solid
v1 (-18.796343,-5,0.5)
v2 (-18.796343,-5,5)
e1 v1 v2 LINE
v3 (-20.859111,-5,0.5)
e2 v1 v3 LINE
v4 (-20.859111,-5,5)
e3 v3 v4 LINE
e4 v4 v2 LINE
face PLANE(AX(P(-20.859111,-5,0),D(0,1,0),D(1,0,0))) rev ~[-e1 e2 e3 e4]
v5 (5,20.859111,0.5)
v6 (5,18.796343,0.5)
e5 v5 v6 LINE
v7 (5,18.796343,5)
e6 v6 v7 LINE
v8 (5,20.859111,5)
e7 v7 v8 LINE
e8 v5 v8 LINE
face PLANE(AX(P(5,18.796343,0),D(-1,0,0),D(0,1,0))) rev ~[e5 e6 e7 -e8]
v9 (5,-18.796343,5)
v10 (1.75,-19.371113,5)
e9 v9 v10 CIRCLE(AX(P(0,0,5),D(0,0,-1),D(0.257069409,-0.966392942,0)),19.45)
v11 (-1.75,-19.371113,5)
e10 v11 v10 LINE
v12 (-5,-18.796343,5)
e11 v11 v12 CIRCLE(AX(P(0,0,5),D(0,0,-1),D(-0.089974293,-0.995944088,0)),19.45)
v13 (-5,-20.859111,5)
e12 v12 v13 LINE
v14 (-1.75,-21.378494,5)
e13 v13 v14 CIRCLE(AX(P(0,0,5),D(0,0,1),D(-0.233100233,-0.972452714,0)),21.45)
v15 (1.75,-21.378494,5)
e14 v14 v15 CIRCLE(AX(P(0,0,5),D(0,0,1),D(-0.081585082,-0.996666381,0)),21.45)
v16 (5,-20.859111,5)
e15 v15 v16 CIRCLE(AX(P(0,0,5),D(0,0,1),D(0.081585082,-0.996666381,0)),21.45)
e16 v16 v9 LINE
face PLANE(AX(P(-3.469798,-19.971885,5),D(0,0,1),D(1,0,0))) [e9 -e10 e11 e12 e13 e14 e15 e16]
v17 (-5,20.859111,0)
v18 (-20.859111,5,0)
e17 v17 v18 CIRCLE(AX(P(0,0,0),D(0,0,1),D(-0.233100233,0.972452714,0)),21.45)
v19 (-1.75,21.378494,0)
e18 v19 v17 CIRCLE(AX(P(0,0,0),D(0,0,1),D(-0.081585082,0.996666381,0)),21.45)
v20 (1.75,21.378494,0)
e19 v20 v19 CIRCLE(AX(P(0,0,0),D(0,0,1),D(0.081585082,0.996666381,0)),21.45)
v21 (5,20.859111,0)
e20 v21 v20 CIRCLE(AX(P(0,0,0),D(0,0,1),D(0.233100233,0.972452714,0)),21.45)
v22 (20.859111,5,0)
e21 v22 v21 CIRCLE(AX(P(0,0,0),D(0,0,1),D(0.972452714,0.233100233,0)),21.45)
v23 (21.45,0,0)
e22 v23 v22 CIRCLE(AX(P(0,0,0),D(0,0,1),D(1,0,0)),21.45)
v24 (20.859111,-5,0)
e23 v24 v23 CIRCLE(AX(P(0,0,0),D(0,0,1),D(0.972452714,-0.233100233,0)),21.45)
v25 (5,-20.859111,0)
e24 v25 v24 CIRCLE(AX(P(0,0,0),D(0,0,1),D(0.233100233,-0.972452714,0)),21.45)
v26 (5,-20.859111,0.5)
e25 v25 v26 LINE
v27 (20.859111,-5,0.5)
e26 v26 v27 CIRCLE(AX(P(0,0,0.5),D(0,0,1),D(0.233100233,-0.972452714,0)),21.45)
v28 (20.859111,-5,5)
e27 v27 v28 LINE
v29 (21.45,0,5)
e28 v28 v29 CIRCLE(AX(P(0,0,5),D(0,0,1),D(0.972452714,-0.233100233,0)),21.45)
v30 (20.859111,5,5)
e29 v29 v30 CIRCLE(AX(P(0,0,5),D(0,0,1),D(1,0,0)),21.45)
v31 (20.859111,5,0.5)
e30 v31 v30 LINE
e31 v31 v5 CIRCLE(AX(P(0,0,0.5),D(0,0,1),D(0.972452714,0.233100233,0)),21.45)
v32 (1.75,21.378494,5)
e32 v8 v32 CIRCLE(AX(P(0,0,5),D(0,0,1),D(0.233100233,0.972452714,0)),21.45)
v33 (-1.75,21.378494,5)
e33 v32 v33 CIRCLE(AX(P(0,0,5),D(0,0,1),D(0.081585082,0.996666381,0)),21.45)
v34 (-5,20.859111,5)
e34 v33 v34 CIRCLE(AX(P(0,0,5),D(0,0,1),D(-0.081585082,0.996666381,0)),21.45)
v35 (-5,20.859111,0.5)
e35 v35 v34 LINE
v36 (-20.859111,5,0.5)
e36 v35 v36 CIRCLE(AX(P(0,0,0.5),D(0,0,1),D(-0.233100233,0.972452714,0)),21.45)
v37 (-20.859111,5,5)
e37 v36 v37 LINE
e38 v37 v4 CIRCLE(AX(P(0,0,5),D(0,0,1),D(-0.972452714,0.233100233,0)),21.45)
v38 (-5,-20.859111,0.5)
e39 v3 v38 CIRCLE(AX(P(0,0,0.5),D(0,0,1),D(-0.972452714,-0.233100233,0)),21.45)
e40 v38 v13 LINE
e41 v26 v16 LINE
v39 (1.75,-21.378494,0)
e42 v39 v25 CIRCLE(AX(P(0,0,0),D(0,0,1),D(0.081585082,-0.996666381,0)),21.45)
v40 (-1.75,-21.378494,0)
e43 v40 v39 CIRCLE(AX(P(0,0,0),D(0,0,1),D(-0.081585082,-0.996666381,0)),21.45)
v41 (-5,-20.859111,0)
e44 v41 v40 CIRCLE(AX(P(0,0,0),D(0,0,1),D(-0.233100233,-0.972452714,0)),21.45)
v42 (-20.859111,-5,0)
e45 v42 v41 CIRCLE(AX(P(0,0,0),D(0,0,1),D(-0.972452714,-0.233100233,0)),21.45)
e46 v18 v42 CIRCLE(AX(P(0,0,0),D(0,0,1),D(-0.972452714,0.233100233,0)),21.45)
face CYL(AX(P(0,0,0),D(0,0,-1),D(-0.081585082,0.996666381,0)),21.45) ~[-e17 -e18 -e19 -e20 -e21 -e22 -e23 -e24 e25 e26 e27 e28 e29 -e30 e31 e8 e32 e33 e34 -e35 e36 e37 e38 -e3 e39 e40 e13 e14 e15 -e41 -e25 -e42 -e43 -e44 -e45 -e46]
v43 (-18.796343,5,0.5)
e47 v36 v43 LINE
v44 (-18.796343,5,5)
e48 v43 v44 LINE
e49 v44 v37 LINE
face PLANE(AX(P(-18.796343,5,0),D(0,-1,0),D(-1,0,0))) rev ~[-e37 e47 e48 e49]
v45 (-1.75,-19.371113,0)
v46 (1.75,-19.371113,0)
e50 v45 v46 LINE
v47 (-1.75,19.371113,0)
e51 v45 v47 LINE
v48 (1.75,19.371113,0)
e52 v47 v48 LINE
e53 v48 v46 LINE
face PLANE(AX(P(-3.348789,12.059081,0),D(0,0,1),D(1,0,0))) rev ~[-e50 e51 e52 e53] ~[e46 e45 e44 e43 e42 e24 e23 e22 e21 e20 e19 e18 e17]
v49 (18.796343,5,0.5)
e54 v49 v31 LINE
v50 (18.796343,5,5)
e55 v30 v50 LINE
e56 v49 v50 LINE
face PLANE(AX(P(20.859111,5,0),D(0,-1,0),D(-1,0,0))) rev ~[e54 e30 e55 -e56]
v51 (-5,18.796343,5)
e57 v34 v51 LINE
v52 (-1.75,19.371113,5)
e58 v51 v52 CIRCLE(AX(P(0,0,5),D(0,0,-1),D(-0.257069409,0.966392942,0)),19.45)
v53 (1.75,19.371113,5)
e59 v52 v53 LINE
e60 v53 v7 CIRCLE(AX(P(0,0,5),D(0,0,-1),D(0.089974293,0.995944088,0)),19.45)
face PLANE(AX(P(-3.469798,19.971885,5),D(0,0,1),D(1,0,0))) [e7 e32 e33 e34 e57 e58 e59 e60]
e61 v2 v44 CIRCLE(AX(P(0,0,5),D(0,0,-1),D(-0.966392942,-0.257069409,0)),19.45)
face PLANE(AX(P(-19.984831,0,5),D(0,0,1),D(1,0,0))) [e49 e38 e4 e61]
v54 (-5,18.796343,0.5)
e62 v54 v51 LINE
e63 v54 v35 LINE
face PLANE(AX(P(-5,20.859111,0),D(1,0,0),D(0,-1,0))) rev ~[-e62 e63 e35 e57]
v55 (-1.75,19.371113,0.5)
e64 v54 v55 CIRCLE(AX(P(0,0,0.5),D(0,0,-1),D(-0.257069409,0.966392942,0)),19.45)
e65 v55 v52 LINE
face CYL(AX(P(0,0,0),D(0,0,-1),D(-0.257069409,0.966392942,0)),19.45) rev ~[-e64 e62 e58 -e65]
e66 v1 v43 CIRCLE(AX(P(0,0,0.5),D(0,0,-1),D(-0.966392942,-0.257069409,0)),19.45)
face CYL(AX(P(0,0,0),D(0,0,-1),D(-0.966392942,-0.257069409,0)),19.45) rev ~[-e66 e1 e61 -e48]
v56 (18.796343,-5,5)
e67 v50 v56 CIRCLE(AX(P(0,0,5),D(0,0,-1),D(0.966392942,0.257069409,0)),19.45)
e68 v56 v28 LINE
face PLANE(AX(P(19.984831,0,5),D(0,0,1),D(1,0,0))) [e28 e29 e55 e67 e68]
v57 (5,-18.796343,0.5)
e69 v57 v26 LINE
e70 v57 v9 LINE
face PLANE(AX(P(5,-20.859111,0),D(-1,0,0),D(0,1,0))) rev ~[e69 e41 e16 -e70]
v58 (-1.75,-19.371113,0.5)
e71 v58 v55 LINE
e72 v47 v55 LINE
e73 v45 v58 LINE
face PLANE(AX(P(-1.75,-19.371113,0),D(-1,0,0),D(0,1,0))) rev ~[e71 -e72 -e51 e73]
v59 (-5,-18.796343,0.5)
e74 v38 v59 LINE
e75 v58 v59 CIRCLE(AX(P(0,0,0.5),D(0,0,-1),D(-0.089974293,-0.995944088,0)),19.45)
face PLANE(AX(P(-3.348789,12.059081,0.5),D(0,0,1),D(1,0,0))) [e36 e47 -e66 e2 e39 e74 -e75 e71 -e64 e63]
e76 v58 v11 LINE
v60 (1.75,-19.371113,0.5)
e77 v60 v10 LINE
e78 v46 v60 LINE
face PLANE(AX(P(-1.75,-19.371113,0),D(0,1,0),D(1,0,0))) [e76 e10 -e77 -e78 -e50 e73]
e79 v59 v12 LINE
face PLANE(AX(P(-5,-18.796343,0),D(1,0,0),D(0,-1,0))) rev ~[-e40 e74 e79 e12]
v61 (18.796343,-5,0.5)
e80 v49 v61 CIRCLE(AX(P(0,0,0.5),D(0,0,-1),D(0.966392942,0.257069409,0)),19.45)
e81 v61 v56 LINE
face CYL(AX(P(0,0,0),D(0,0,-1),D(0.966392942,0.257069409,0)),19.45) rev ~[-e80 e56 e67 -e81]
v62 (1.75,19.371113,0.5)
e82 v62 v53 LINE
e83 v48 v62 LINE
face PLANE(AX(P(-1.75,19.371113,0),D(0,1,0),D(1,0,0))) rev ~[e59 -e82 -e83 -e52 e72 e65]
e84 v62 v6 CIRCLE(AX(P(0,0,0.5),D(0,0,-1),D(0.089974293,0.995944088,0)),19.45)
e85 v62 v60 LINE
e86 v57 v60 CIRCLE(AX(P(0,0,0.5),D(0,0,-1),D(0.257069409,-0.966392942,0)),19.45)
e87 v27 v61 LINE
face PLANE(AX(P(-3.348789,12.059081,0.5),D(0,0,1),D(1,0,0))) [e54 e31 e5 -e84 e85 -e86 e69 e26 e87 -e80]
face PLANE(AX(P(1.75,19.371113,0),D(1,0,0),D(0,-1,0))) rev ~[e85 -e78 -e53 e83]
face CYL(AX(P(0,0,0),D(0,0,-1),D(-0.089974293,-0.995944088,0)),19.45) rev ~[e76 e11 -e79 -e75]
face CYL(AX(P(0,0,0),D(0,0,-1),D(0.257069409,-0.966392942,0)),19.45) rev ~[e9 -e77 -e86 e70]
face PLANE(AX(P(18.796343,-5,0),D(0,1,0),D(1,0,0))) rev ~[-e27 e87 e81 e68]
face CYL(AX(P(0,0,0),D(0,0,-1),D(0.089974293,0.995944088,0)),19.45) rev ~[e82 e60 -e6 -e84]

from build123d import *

# Parameters (mm, degrees)
F0_W     = 3.5
F0_H     = 1.4879982061
F0_W_2   = 3.25
F0_H_2   = 10
F0_H_3   = 0.5193831472
F1_DEPTH = 0.5
F2_DEPTH = 5


# Not quite as in the source:
# - a feature of the source that left no trace in its solid (it failed there, or was rolled back) is left out
# - a feature names something its author has since deleted; it is built from what else it names


with BuildPart() as f1:
    # F0 (on Top) → F1 (new body)
    with BuildSketch(Plane.XY):
        with BuildLine():
            Line((-1.75, 5), (-1.75, 19.3711125132))
            ThreePointArc((-1.75, 19.3711125132), (-3.3872134677, 19.1527879152), (-5, 18.7963427294))
            Line((-5, 18.7963427294), (-5, 5))
            Line((-5, 5), (-1.75, 5))
        make_face()
        with BuildLine():
            ThreePointArc((-5, 18.7963427294), (-3.3872134677, 19.1527879152), (-1.75, 19.3711125132))
            Line((-1.75, 19.3711125132), (-1.75, 20.8591107193))
            Line((-1.75, 20.8591107193), (-5, 20.8591107193))
            Line((-5, 20.8591107193), (-5, 18.7963427294))
        make_face()
        with Locations((0, 20.1151116163)):
            Rectangle(F0_W, F0_H)
        with BuildLine():
            Line((-5, 5), (-5, 18.7963427294))
            ThreePointArc((-5, 18.7963427294), (-13.7532268941, 13.7532268941), (-18.7963427294, 5))
            Line((-18.7963427294, 5), (-5, 5))
        make_face()
        with BuildLine():
            ThreePointArc((-18.7963427294, 5), (-13.7532268941, 13.7532268941), (-5, 18.7963427294))
            Line((-5, 18.7963427294), (-5, 20.8591107193))
            ThreePointArc((-5, 20.8591107193), (-15.1674404565, 15.1674404565), (-20.8591107193, 5))
            Line((-20.8591107193, 5), (-18.7963427294, 5))
        make_face()
        with Locations((-3.375, 0)):
            Rectangle(F0_W_2, F0_H_2)
        with Locations((0, 21.1188022929)):
            Rectangle(F0_W, F0_H_3)
        with BuildLine():
            Line((-5, 20.8591107193), (-1.75, 20.8591107193))
            Line((-1.75, 20.8591107193), (-1.75, 21.3784938665))
            ThreePointArc((-1.75, 21.3784938665), (-3.3849763239, 21.1812283706), (-5, 20.8591107193))
        make_face()
        with BuildLine():
            ThreePointArc((5, 18.7963427294), (3.3872134677, 19.1527879152), (1.75, 19.3711125132))
            Line((1.75, 19.3711125132), (1.75, 5))
            Line((1.75, 5), (5, 5))
            Line((5, 5), (5, 18.7963427294))
        make_face()
        with BuildLine():
            Line((1.75, 20.8591107193), (1.75, 19.3711125132))
            ThreePointArc((1.75, 19.3711125132), (3.3872134677, 19.1527879152), (5, 18.7963427294))
            Line((5, 18.7963427294), (5, 20.8591107193))
            Line((5, 20.8591107193), (1.75, 20.8591107193))
        make_face()
        with BuildLine():
            Line((-5, 5), (-18.7963427294, 5))
            ThreePointArc((-18.7963427294, 5), (-19.45, 0), (-18.7963427294, -5))
            Line((-18.7963427294, -5), (-5, -5))
            Line((-5, -5), (-5, 5))
        make_face()
        with BuildLine():
            ThreePointArc((-18.7963427294, -5), (-19.45, 0), (-18.7963427294, 5))
            Line((-18.7963427294, 5), (-20.8591107193, 5))
            Line((-20.8591107193, 5), (-20.8591107193, -5))
            Line((-20.8591107193, -5), (-18.7963427294, -5))
        make_face()
        with Locations((3.375, 0)):
            Rectangle(F0_W_2, F0_H_2)
        with BuildLine():
            Line((-1.75, -19.3711125132), (-1.75, -5))
            Line((-1.75, -5), (-5, -5))
            Line((-5, -5), (-5, -18.7963427294))
            ThreePointArc((-5, -18.7963427294), (-3.3872134677, -19.1527879152), (-1.75, -19.3711125132))
        make_face()
        with BuildLine():
            Line((1.75, 21.3784938665), (1.75, 20.8591107193))
            Line((1.75, 20.8591107193), (5, 20.8591107193))
            ThreePointArc((5, 20.8591107193), (3.3849763239, 21.1812283706), (1.75, 21.3784938665))
        make_face()
        with BuildLine():
            ThreePointArc((1.75, 21.3784938665), (0, 21.45), (-1.75, 21.3784938665))
            Line((-1.75, 21.3784938665), (1.75, 21.3784938665))
        make_face()
        with BuildLine():
            ThreePointArc((18.7963427294, 5), (13.7532268941, 13.7532268941), (5, 18.7963427294))
            Line((5, 18.7963427294), (5, 5))
            Line((5, 5), (18.7963427294, 5))
        make_face()
        with BuildLine():
            Line((5, 20.8591107193), (5, 18.7963427294))
            ThreePointArc((5, 18.7963427294), (13.7532268941, 13.7532268941), (18.7963427294, 5))
            Line((18.7963427294, 5), (20.8591107193, 5))
            ThreePointArc((20.8591107193, 5), (15.1674404565, 15.1674404565), (5, 20.8591107193))
        make_face()
        with BuildLine():
            Line((-5, -5), (-18.7963427294, -5))
            ThreePointArc((-18.7963427294, -5), (-13.7532268941, -13.7532268941), (-5, -18.7963427294))
            Line((-5, -18.7963427294), (-5, -5))
        make_face()
        with BuildLine():
            ThreePointArc((-5, -18.7963427294), (-13.7532268941, -13.7532268941), (-18.7963427294, -5))
            Line((-18.7963427294, -5), (-20.8591107193, -5))
            ThreePointArc((-20.8591107193, -5), (-15.1674404565, -15.1674404565), (-5, -20.8591107193))
            Line((-5, -20.8591107193), (-5, -18.7963427294))
        make_face()
        with BuildLine():
            Line((-20.8591107193, -5), (-20.8591107193, 5))
            ThreePointArc((-20.8591107193, 5), (-21.45, 0), (-20.8591107193, -5))
        make_face()
        with BuildLine():
            Line((18.7963427294, 5), (5, 5))
            Line((5, 5), (5, -5))
            Line((5, -5), (18.7963427294, -5))
            ThreePointArc((18.7963427294, -5), (19.45, 0), (18.7963427294, 5))
        make_face()
        with BuildLine():
            Line((5, -5), (1.75, -5))
            Line((1.75, -5), (1.75, -19.3711125132))
            ThreePointArc((1.75, -19.3711125132), (3.3872134677, -19.1527879152), (5, -18.7963427294))
            Line((5, -18.7963427294), (5, -5))
        make_face()
        with BuildLine():
            Line((-1.75, -20.8591107193), (-1.75, -19.3711125132))
            ThreePointArc((-1.75, -19.3711125132), (-3.3872134677, -19.1527879152), (-5, -18.7963427294))
            Line((-5, -18.7963427294), (-5, -20.8591107193))
            Line((-5, -20.8591107193), (-1.75, -20.8591107193))
        make_face()
        with Locations((0, -20.1151116163)):
            Rectangle(F0_W, F0_H)
        with BuildLine():
            Line((20.8591107193, 5), (18.7963427294, 5))
            ThreePointArc((18.7963427294, 5), (19.45, 0), (18.7963427294, -5))
            Line((18.7963427294, -5), (20.8591107193, -5))
            Line((20.8591107193, -5), (20.8591107193, 5))
        make_face()
        with BuildLine():
            Line((18.7963427294, -5), (5, -5))
            Line((5, -5), (5, -18.7963427294))
            ThreePointArc((5, -18.7963427294), (13.7532268941, -13.7532268941), (18.7963427294, -5))
        make_face()
        with BuildLine():
            ThreePointArc((5, -18.7963427294), (3.3872134677, -19.1527879152), (1.75, -19.3711125132))
            Line((1.75, -19.3711125132), (1.75, -20.8591107193))
            Line((1.75, -20.8591107193), (5, -20.8591107193))
            Line((5, -20.8591107193), (5, -18.7963427294))
        make_face()
        with BuildLine():
            Line((-1.75, -21.3784938665), (-1.75, -20.8591107193))
            Line((-1.75, -20.8591107193), (-5, -20.8591107193))
            ThreePointArc((-5, -20.8591107193), (-3.3849763239, -21.1812283706), (-1.75, -21.3784938665))
        make_face()
        with Locations((0, -21.1188022929)):
            Rectangle(F0_W, F0_H_3)
        with BuildLine():
            ThreePointArc((21.45, 0), (21.3017654776, 2.5173969761), (20.8591107193, 5))
            Line((20.8591107193, 5), (20.8591107193, -5))
            ThreePointArc((20.8591107193, -5), (21.3017654776, -2.5173969761), (21.45, 0))
        make_face()
        with BuildLine():
            Line((20.8591107193, -5), (18.7963427294, -5))
            ThreePointArc((18.7963427294, -5), (13.7532268941, -13.7532268941), (5, -18.7963427294))
            Line((5, -18.7963427294), (5, -20.8591107193))
            ThreePointArc((5, -20.8591107193), (15.1674404565, -15.1674404565), (20.8591107193, -5))
        make_face()
        with BuildLine():
            Line((5, -20.8591107193), (1.75, -20.8591107193))
            Line((1.75, -20.8591107193), (1.75, -21.3784938665))
            ThreePointArc((1.75, -21.3784938665), (3.3849763239, -21.1812283706), (5, -20.8591107193))
        make_face()
        with BuildLine():
            Line((1.75, -21.3784938665), (-1.75, -21.3784938665))
            ThreePointArc((-1.75, -21.3784938665), (0, -21.45), (1.75, -21.3784938665))
        make_face()
    extrude(amount=F1_DEPTH)

    # F0 (on Top) → F2 (join)
    with BuildSketch(Plane.XY):
        with BuildLine():
            ThreePointArc((-5, 18.7963427294), (-3.3872134677, 19.1527879152), (-1.75, 19.3711125132))
            Line((-1.75, 19.3711125132), (-1.75, 20.8591107193))
            Line((-1.75, 20.8591107193), (-5, 20.8591107193))
            Line((-5, 20.8591107193), (-5, 18.7963427294))
        make_face()
        with Locations((0, 20.1151116163)):
            Rectangle(F0_W, F0_H)
        with Locations((0, 21.1188022929)):
            Rectangle(F0_W, F0_H_3)
        with BuildLine():
            Line((-5, 20.8591107193), (-1.75, 20.8591107193))
            Line((-1.75, 20.8591107193), (-1.75, 21.3784938665))
            ThreePointArc((-1.75, 21.3784938665), (-3.3849763239, 21.1812283706), (-5, 20.8591107193))
        make_face()
        with BuildLine():
            Line((1.75, 20.8591107193), (1.75, 19.3711125132))
            ThreePointArc((1.75, 19.3711125132), (3.3872134677, 19.1527879152), (5, 18.7963427294))
            Line((5, 18.7963427294), (5, 20.8591107193))
            Line((5, 20.8591107193), (1.75, 20.8591107193))
        make_face()
        with BuildLine():
            ThreePointArc((-18.7963427294, -5), (-19.45, 0), (-18.7963427294, 5))
            Line((-18.7963427294, 5), (-20.8591107193, 5))
            Line((-20.8591107193, 5), (-20.8591107193, -5))
            Line((-20.8591107193, -5), (-18.7963427294, -5))
        make_face()
        with BuildLine():
            Line((1.75, 21.3784938665), (1.75, 20.8591107193))
            Line((1.75, 20.8591107193), (5, 20.8591107193))
            ThreePointArc((5, 20.8591107193), (3.3849763239, 21.1812283706), (1.75, 21.3784938665))
        make_face()
        with BuildLine():
            ThreePointArc((1.75, 21.3784938665), (0, 21.45), (-1.75, 21.3784938665))
            Line((-1.75, 21.3784938665), (1.75, 21.3784938665))
        make_face()
        with BuildLine():
            Line((-20.8591107193, -5), (-20.8591107193, 5))
            ThreePointArc((-20.8591107193, 5), (-21.45, 0), (-20.8591107193, -5))
        make_face()
        with BuildLine():
            Line((-1.75, -20.8591107193), (-1.75, -19.3711125132))
            ThreePointArc((-1.75, -19.3711125132), (-3.3872134677, -19.1527879152), (-5, -18.7963427294))
            Line((-5, -18.7963427294), (-5, -20.8591107193))
            Line((-5, -20.8591107193), (-1.75, -20.8591107193))
        make_face()
        with Locations((0, -20.1151116163)):
            Rectangle(F0_W, F0_H)
        with BuildLine():
            Line((20.8591107193, 5), (18.7963427294, 5))
            ThreePointArc((18.7963427294, 5), (19.45, 0), (18.7963427294, -5))
            Line((18.7963427294, -5), (20.8591107193, -5))
            Line((20.8591107193, -5), (20.8591107193, 5))
        make_face()
        with BuildLine():
            ThreePointArc((5, -18.7963427294), (3.3872134677, -19.1527879152), (1.75, -19.3711125132))
            Line((1.75, -19.3711125132), (1.75, -20.8591107193))
            Line((1.75, -20.8591107193), (5, -20.8591107193))
            Line((5, -20.8591107193), (5, -18.7963427294))
        make_face()
        with BuildLine():
            Line((-1.75, -21.3784938665), (-1.75, -20.8591107193))
            Line((-1.75, -20.8591107193), (-5, -20.8591107193))
            ThreePointArc((-5, -20.8591107193), (-3.3849763239, -21.1812283706), (-1.75, -21.3784938665))
        make_face()
        with Locations((0, -21.1188022929)):
            Rectangle(F0_W, F0_H_3)
        with BuildLine():
            ThreePointArc((21.45, 0), (21.3017654776, 2.5173969761), (20.8591107193, 5))
            Line((20.8591107193, 5), (20.8591107193, -5))
            ThreePointArc((20.8591107193, -5), (21.3017654776, -2.5173969761), (21.45, 0))
        make_face()
        with BuildLine():
            Line((5, -20.8591107193), (1.75, -20.8591107193))
            Line((1.75, -20.8591107193), (1.75, -21.3784938665))
            ThreePointArc((1.75, -21.3784938665), (3.3849763239, -21.1812283706), (5, -20.8591107193))
        make_face()
        with BuildLine():
            Line((1.75, -21.3784938665), (-1.75, -21.3784938665))
            ThreePointArc((-1.75, -21.3784938665), (0, -21.45), (1.75, -21.3784938665))
        make_face()
    extrude(amount=F2_DEPTH)


solid = f1.part
